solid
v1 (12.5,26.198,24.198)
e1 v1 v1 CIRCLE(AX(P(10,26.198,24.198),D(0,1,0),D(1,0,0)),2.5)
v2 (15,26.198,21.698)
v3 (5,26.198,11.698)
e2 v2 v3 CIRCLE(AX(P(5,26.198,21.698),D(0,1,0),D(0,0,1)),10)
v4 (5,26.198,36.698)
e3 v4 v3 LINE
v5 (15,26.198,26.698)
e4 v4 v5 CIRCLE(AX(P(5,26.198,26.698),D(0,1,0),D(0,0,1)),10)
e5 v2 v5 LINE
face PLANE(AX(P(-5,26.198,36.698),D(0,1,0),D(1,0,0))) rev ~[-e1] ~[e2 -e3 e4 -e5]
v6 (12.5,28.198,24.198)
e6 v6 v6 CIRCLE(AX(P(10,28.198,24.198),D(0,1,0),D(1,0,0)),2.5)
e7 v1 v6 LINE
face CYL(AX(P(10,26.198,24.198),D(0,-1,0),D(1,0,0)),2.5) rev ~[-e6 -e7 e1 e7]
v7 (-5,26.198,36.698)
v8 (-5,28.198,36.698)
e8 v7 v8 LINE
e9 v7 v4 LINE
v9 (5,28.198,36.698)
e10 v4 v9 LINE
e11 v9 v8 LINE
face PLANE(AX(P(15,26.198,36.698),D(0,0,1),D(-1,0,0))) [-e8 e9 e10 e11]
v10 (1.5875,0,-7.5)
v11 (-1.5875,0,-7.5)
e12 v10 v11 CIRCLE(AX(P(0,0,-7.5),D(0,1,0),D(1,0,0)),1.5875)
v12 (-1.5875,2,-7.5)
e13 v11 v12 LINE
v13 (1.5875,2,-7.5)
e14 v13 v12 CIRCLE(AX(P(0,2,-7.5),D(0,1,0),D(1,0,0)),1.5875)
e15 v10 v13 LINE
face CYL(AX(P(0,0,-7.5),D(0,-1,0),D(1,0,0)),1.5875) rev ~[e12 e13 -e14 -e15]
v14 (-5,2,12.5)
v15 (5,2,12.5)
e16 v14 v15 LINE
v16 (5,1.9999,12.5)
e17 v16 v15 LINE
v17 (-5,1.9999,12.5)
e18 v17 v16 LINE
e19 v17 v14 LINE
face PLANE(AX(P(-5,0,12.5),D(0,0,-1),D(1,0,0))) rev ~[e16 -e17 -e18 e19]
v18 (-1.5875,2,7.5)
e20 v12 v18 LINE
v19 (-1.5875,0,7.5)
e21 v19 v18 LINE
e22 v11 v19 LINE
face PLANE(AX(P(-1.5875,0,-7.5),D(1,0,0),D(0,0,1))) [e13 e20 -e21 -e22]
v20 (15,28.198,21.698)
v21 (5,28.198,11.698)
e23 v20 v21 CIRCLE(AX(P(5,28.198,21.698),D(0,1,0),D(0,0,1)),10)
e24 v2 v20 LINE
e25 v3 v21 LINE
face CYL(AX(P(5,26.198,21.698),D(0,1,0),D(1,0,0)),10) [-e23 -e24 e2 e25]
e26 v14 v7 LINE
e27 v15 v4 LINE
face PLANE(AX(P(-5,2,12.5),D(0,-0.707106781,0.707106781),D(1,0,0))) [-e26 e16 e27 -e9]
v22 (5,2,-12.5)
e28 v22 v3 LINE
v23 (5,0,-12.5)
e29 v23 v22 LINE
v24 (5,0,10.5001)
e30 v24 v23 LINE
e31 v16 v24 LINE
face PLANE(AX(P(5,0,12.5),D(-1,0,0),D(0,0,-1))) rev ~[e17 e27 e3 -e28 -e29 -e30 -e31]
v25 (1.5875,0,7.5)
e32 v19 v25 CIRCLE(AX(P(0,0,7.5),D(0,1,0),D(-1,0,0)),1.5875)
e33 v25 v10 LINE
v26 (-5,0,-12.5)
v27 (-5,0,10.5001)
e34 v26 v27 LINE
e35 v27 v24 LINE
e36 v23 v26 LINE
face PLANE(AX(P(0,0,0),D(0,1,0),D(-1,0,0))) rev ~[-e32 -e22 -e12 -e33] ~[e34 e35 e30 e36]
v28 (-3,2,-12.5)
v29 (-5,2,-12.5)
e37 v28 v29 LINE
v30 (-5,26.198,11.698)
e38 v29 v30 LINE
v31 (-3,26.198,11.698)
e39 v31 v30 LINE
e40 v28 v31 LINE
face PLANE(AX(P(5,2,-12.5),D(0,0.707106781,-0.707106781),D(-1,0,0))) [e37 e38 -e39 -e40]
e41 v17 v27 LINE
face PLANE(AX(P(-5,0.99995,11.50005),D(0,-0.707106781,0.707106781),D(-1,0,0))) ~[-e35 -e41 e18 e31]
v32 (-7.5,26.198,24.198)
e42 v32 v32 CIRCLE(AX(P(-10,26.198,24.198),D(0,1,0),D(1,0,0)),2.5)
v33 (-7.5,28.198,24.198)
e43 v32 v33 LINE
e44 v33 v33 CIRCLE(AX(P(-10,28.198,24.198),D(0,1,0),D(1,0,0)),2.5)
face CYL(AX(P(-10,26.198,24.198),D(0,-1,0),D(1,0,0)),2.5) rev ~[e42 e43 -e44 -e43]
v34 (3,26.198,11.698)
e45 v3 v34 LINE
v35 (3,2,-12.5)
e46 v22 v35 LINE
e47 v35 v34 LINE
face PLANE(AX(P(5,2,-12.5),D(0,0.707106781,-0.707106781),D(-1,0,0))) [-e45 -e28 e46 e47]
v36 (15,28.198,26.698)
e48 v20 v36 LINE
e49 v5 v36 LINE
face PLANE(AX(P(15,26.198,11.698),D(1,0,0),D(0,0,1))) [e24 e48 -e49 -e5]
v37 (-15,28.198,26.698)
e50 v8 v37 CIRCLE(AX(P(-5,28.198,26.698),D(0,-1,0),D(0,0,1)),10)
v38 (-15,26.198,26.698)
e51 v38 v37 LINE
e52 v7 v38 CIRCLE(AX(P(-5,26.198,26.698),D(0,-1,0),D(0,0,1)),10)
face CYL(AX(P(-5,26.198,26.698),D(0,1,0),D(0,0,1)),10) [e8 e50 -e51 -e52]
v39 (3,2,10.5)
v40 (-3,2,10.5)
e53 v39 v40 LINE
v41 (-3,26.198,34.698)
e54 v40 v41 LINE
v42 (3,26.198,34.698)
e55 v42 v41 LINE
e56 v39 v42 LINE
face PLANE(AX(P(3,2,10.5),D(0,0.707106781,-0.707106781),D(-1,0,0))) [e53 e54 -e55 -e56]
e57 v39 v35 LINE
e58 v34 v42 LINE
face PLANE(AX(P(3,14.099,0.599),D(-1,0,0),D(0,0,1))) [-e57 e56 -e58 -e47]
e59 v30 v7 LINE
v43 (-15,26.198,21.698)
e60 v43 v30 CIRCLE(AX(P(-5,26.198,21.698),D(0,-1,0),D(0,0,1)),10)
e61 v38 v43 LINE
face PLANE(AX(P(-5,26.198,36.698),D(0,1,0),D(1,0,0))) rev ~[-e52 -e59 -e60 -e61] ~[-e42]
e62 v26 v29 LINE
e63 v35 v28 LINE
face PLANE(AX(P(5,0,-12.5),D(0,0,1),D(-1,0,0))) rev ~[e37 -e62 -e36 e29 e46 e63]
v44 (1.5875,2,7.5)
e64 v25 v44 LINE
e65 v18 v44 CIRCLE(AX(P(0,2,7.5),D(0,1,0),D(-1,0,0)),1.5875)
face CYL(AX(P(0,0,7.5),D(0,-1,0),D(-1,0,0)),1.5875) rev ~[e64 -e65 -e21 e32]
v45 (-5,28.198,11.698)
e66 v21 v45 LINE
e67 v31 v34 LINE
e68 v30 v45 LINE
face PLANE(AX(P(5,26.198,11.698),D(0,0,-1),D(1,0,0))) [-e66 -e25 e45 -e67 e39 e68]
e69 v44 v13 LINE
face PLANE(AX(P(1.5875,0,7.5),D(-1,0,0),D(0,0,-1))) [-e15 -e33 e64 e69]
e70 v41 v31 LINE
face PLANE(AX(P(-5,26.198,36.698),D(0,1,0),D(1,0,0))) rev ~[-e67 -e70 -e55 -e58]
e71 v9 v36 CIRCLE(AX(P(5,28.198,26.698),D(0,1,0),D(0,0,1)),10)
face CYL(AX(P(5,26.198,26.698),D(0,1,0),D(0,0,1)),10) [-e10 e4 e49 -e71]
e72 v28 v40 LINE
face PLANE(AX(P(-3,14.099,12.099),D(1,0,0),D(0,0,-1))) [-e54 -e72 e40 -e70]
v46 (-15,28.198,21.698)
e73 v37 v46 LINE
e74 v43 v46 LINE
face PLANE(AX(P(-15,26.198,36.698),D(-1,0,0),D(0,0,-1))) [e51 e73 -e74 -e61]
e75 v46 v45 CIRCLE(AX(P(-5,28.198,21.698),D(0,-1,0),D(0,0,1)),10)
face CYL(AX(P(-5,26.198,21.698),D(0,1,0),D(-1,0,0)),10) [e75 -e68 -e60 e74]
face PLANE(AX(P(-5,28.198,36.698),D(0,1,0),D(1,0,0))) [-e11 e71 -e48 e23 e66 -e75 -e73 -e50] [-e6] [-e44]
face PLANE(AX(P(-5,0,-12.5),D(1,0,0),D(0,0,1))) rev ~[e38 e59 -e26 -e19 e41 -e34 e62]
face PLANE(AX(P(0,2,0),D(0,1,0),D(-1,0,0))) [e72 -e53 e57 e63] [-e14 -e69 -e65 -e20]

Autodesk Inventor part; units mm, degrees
ref_plane "YZ Plane" through (0, 0, 0) normal (1, 0, 0) x (0, 1, 0)
ref_plane "XZ Plane" through (0, 0, 0) normal (0, 1, 0) x (-1, 0, 0)
ref_plane "XY Plane" through (0, 0, 0) normal (0, 0, 1) x (1, 0, 0)
sketch "Sketch1" plane through (0, 0, 0) normal (0, 1, 0) x (-1, 0, 0)
  line L0 (5, 12.5) -> (-5, 12.5)
  line L1 (-5, 12.5) -> (-5, -12.5)
  line L2 (-5, -12.5) -> (5, -12.5)
  line L3 (5, -12.5) -> (5, 12.5)
  line L4 (5, 12.5) -> (-5, -12.5) construction
  line L5 (-5, 12.5) -> (5, -12.5) construction
  line L6 (0, 7.5) -> (0, -7.5) construction
  line L7 (-1.5875, 7.5) -> (-1.5875, -7.5)
  line L8 (1.5875, -7.5) -> (1.5875, 7.5)
  arc A0 (1.5875, 7.5) -> (-1.5875, 7.5) centre (0, 7.5) ccw
  arc A1 (-1.5875, -7.5) -> (1.5875, -7.5) centre (0, -7.5) ccw
  point P0 (0, 0)
  point P1 (0, 0)
  dimension "d0" = 10
  dimension "d1" = 25
  dimension "d2" = 7.5
  dimension "d3" = 7.5
  dimension "d4" = 3.175
extrude "Extrusion1" add sketch "Sketch1" along normal blind 2
sketch "Sketch2" plane through (0, 2, 0) normal (0, 1, 0) x (1, 0, 0)
  line L0 (5, -12.5) -> (5, 12.5) projected
  line L1 (5, 12.5) -> (-5, 12.5) projected
  line L2 (-5, 12.5) -> (-5, -12.5) projected
  line L3 (-5, -12.5) -> (5, -12.5) projected
  arc A0 (-1.5875, -7.5) -> (1.5875, -7.5) centre (0, -7.5) ccw projected
  line L4 (-1.5875, -7.5) -> (-1.5875, 7.5) projected
  arc A1 (1.5875, 7.5) -> (-1.5875, 7.5) centre (0, 7.5) ccw projected
  line L5 (1.5875, 7.5) -> (1.5875, -7.5) projected
  line L6 (-3, -10.5) -> (-3, 10.5)
  line L7 (3, 10.5) -> (3, -10.5)
  line L8 (3, -10.5) -> (-3, -10.5)
  line L9 (-3, 10.5) -> (-3, 12.5)
  line L10 (3, 10.5) -> (3, 12.5)
  point P0 (0, 0)
  dimension "d7" = 2
sketch "Sketch3" plane through (0, 0, 0) normal (1, 0, 0) x (0, 1, 0)
  line L0 (2, 12.5) -> (26.198, 36.698)
  point P0 (0, 0)
  dimension "d15" = 34.2211
sweep "Sweep1" add profiles "Sketch2" path "Sketch3" contours L3 L2 L1 L9 L6 L8 L7 L10 L0
chamfer "Chamfer1" distance 2 angle 45 1 edges at (0, 0, 12.5)
sketch "Sketch5" plane through (-5, 26.198, 36.698) normal (0, 1, 0) x (1, 0, 0)
  line L0 (20, 0) -> (-10, 0)
  line L1 (-10, 0) -> (-10, 25)
  line L2 (-10, 25) -> (20, 25)
  line L3 (20, 25) -> (20, 0)
  line L4 (10, 0) -> (10, 25) projected
  circle A0 centre (15, 12.5) radius 2.5
  circle A1 centre (-5, 12.5) radius 2.5
  point P0 (5, 36.698)
  dimension "d23" = 25
  dimension "d24" = 30
  dimension "d25" = 10
  dimension "d26" = 5
  dimension "d27" = 5
  dimension "d28" = 5
  dimension "d29" = 5
extrude "Extrusion4" add sketch "Sketch5" along normal blind 2
fillet "Fillet1" radius 10 4 edges at (15, 27.198, 11.698) (-15, 27.198, 11.698) (-15, 27.198, 36.698) (15, 27.198, 36.698)
properties part number "ancla"
